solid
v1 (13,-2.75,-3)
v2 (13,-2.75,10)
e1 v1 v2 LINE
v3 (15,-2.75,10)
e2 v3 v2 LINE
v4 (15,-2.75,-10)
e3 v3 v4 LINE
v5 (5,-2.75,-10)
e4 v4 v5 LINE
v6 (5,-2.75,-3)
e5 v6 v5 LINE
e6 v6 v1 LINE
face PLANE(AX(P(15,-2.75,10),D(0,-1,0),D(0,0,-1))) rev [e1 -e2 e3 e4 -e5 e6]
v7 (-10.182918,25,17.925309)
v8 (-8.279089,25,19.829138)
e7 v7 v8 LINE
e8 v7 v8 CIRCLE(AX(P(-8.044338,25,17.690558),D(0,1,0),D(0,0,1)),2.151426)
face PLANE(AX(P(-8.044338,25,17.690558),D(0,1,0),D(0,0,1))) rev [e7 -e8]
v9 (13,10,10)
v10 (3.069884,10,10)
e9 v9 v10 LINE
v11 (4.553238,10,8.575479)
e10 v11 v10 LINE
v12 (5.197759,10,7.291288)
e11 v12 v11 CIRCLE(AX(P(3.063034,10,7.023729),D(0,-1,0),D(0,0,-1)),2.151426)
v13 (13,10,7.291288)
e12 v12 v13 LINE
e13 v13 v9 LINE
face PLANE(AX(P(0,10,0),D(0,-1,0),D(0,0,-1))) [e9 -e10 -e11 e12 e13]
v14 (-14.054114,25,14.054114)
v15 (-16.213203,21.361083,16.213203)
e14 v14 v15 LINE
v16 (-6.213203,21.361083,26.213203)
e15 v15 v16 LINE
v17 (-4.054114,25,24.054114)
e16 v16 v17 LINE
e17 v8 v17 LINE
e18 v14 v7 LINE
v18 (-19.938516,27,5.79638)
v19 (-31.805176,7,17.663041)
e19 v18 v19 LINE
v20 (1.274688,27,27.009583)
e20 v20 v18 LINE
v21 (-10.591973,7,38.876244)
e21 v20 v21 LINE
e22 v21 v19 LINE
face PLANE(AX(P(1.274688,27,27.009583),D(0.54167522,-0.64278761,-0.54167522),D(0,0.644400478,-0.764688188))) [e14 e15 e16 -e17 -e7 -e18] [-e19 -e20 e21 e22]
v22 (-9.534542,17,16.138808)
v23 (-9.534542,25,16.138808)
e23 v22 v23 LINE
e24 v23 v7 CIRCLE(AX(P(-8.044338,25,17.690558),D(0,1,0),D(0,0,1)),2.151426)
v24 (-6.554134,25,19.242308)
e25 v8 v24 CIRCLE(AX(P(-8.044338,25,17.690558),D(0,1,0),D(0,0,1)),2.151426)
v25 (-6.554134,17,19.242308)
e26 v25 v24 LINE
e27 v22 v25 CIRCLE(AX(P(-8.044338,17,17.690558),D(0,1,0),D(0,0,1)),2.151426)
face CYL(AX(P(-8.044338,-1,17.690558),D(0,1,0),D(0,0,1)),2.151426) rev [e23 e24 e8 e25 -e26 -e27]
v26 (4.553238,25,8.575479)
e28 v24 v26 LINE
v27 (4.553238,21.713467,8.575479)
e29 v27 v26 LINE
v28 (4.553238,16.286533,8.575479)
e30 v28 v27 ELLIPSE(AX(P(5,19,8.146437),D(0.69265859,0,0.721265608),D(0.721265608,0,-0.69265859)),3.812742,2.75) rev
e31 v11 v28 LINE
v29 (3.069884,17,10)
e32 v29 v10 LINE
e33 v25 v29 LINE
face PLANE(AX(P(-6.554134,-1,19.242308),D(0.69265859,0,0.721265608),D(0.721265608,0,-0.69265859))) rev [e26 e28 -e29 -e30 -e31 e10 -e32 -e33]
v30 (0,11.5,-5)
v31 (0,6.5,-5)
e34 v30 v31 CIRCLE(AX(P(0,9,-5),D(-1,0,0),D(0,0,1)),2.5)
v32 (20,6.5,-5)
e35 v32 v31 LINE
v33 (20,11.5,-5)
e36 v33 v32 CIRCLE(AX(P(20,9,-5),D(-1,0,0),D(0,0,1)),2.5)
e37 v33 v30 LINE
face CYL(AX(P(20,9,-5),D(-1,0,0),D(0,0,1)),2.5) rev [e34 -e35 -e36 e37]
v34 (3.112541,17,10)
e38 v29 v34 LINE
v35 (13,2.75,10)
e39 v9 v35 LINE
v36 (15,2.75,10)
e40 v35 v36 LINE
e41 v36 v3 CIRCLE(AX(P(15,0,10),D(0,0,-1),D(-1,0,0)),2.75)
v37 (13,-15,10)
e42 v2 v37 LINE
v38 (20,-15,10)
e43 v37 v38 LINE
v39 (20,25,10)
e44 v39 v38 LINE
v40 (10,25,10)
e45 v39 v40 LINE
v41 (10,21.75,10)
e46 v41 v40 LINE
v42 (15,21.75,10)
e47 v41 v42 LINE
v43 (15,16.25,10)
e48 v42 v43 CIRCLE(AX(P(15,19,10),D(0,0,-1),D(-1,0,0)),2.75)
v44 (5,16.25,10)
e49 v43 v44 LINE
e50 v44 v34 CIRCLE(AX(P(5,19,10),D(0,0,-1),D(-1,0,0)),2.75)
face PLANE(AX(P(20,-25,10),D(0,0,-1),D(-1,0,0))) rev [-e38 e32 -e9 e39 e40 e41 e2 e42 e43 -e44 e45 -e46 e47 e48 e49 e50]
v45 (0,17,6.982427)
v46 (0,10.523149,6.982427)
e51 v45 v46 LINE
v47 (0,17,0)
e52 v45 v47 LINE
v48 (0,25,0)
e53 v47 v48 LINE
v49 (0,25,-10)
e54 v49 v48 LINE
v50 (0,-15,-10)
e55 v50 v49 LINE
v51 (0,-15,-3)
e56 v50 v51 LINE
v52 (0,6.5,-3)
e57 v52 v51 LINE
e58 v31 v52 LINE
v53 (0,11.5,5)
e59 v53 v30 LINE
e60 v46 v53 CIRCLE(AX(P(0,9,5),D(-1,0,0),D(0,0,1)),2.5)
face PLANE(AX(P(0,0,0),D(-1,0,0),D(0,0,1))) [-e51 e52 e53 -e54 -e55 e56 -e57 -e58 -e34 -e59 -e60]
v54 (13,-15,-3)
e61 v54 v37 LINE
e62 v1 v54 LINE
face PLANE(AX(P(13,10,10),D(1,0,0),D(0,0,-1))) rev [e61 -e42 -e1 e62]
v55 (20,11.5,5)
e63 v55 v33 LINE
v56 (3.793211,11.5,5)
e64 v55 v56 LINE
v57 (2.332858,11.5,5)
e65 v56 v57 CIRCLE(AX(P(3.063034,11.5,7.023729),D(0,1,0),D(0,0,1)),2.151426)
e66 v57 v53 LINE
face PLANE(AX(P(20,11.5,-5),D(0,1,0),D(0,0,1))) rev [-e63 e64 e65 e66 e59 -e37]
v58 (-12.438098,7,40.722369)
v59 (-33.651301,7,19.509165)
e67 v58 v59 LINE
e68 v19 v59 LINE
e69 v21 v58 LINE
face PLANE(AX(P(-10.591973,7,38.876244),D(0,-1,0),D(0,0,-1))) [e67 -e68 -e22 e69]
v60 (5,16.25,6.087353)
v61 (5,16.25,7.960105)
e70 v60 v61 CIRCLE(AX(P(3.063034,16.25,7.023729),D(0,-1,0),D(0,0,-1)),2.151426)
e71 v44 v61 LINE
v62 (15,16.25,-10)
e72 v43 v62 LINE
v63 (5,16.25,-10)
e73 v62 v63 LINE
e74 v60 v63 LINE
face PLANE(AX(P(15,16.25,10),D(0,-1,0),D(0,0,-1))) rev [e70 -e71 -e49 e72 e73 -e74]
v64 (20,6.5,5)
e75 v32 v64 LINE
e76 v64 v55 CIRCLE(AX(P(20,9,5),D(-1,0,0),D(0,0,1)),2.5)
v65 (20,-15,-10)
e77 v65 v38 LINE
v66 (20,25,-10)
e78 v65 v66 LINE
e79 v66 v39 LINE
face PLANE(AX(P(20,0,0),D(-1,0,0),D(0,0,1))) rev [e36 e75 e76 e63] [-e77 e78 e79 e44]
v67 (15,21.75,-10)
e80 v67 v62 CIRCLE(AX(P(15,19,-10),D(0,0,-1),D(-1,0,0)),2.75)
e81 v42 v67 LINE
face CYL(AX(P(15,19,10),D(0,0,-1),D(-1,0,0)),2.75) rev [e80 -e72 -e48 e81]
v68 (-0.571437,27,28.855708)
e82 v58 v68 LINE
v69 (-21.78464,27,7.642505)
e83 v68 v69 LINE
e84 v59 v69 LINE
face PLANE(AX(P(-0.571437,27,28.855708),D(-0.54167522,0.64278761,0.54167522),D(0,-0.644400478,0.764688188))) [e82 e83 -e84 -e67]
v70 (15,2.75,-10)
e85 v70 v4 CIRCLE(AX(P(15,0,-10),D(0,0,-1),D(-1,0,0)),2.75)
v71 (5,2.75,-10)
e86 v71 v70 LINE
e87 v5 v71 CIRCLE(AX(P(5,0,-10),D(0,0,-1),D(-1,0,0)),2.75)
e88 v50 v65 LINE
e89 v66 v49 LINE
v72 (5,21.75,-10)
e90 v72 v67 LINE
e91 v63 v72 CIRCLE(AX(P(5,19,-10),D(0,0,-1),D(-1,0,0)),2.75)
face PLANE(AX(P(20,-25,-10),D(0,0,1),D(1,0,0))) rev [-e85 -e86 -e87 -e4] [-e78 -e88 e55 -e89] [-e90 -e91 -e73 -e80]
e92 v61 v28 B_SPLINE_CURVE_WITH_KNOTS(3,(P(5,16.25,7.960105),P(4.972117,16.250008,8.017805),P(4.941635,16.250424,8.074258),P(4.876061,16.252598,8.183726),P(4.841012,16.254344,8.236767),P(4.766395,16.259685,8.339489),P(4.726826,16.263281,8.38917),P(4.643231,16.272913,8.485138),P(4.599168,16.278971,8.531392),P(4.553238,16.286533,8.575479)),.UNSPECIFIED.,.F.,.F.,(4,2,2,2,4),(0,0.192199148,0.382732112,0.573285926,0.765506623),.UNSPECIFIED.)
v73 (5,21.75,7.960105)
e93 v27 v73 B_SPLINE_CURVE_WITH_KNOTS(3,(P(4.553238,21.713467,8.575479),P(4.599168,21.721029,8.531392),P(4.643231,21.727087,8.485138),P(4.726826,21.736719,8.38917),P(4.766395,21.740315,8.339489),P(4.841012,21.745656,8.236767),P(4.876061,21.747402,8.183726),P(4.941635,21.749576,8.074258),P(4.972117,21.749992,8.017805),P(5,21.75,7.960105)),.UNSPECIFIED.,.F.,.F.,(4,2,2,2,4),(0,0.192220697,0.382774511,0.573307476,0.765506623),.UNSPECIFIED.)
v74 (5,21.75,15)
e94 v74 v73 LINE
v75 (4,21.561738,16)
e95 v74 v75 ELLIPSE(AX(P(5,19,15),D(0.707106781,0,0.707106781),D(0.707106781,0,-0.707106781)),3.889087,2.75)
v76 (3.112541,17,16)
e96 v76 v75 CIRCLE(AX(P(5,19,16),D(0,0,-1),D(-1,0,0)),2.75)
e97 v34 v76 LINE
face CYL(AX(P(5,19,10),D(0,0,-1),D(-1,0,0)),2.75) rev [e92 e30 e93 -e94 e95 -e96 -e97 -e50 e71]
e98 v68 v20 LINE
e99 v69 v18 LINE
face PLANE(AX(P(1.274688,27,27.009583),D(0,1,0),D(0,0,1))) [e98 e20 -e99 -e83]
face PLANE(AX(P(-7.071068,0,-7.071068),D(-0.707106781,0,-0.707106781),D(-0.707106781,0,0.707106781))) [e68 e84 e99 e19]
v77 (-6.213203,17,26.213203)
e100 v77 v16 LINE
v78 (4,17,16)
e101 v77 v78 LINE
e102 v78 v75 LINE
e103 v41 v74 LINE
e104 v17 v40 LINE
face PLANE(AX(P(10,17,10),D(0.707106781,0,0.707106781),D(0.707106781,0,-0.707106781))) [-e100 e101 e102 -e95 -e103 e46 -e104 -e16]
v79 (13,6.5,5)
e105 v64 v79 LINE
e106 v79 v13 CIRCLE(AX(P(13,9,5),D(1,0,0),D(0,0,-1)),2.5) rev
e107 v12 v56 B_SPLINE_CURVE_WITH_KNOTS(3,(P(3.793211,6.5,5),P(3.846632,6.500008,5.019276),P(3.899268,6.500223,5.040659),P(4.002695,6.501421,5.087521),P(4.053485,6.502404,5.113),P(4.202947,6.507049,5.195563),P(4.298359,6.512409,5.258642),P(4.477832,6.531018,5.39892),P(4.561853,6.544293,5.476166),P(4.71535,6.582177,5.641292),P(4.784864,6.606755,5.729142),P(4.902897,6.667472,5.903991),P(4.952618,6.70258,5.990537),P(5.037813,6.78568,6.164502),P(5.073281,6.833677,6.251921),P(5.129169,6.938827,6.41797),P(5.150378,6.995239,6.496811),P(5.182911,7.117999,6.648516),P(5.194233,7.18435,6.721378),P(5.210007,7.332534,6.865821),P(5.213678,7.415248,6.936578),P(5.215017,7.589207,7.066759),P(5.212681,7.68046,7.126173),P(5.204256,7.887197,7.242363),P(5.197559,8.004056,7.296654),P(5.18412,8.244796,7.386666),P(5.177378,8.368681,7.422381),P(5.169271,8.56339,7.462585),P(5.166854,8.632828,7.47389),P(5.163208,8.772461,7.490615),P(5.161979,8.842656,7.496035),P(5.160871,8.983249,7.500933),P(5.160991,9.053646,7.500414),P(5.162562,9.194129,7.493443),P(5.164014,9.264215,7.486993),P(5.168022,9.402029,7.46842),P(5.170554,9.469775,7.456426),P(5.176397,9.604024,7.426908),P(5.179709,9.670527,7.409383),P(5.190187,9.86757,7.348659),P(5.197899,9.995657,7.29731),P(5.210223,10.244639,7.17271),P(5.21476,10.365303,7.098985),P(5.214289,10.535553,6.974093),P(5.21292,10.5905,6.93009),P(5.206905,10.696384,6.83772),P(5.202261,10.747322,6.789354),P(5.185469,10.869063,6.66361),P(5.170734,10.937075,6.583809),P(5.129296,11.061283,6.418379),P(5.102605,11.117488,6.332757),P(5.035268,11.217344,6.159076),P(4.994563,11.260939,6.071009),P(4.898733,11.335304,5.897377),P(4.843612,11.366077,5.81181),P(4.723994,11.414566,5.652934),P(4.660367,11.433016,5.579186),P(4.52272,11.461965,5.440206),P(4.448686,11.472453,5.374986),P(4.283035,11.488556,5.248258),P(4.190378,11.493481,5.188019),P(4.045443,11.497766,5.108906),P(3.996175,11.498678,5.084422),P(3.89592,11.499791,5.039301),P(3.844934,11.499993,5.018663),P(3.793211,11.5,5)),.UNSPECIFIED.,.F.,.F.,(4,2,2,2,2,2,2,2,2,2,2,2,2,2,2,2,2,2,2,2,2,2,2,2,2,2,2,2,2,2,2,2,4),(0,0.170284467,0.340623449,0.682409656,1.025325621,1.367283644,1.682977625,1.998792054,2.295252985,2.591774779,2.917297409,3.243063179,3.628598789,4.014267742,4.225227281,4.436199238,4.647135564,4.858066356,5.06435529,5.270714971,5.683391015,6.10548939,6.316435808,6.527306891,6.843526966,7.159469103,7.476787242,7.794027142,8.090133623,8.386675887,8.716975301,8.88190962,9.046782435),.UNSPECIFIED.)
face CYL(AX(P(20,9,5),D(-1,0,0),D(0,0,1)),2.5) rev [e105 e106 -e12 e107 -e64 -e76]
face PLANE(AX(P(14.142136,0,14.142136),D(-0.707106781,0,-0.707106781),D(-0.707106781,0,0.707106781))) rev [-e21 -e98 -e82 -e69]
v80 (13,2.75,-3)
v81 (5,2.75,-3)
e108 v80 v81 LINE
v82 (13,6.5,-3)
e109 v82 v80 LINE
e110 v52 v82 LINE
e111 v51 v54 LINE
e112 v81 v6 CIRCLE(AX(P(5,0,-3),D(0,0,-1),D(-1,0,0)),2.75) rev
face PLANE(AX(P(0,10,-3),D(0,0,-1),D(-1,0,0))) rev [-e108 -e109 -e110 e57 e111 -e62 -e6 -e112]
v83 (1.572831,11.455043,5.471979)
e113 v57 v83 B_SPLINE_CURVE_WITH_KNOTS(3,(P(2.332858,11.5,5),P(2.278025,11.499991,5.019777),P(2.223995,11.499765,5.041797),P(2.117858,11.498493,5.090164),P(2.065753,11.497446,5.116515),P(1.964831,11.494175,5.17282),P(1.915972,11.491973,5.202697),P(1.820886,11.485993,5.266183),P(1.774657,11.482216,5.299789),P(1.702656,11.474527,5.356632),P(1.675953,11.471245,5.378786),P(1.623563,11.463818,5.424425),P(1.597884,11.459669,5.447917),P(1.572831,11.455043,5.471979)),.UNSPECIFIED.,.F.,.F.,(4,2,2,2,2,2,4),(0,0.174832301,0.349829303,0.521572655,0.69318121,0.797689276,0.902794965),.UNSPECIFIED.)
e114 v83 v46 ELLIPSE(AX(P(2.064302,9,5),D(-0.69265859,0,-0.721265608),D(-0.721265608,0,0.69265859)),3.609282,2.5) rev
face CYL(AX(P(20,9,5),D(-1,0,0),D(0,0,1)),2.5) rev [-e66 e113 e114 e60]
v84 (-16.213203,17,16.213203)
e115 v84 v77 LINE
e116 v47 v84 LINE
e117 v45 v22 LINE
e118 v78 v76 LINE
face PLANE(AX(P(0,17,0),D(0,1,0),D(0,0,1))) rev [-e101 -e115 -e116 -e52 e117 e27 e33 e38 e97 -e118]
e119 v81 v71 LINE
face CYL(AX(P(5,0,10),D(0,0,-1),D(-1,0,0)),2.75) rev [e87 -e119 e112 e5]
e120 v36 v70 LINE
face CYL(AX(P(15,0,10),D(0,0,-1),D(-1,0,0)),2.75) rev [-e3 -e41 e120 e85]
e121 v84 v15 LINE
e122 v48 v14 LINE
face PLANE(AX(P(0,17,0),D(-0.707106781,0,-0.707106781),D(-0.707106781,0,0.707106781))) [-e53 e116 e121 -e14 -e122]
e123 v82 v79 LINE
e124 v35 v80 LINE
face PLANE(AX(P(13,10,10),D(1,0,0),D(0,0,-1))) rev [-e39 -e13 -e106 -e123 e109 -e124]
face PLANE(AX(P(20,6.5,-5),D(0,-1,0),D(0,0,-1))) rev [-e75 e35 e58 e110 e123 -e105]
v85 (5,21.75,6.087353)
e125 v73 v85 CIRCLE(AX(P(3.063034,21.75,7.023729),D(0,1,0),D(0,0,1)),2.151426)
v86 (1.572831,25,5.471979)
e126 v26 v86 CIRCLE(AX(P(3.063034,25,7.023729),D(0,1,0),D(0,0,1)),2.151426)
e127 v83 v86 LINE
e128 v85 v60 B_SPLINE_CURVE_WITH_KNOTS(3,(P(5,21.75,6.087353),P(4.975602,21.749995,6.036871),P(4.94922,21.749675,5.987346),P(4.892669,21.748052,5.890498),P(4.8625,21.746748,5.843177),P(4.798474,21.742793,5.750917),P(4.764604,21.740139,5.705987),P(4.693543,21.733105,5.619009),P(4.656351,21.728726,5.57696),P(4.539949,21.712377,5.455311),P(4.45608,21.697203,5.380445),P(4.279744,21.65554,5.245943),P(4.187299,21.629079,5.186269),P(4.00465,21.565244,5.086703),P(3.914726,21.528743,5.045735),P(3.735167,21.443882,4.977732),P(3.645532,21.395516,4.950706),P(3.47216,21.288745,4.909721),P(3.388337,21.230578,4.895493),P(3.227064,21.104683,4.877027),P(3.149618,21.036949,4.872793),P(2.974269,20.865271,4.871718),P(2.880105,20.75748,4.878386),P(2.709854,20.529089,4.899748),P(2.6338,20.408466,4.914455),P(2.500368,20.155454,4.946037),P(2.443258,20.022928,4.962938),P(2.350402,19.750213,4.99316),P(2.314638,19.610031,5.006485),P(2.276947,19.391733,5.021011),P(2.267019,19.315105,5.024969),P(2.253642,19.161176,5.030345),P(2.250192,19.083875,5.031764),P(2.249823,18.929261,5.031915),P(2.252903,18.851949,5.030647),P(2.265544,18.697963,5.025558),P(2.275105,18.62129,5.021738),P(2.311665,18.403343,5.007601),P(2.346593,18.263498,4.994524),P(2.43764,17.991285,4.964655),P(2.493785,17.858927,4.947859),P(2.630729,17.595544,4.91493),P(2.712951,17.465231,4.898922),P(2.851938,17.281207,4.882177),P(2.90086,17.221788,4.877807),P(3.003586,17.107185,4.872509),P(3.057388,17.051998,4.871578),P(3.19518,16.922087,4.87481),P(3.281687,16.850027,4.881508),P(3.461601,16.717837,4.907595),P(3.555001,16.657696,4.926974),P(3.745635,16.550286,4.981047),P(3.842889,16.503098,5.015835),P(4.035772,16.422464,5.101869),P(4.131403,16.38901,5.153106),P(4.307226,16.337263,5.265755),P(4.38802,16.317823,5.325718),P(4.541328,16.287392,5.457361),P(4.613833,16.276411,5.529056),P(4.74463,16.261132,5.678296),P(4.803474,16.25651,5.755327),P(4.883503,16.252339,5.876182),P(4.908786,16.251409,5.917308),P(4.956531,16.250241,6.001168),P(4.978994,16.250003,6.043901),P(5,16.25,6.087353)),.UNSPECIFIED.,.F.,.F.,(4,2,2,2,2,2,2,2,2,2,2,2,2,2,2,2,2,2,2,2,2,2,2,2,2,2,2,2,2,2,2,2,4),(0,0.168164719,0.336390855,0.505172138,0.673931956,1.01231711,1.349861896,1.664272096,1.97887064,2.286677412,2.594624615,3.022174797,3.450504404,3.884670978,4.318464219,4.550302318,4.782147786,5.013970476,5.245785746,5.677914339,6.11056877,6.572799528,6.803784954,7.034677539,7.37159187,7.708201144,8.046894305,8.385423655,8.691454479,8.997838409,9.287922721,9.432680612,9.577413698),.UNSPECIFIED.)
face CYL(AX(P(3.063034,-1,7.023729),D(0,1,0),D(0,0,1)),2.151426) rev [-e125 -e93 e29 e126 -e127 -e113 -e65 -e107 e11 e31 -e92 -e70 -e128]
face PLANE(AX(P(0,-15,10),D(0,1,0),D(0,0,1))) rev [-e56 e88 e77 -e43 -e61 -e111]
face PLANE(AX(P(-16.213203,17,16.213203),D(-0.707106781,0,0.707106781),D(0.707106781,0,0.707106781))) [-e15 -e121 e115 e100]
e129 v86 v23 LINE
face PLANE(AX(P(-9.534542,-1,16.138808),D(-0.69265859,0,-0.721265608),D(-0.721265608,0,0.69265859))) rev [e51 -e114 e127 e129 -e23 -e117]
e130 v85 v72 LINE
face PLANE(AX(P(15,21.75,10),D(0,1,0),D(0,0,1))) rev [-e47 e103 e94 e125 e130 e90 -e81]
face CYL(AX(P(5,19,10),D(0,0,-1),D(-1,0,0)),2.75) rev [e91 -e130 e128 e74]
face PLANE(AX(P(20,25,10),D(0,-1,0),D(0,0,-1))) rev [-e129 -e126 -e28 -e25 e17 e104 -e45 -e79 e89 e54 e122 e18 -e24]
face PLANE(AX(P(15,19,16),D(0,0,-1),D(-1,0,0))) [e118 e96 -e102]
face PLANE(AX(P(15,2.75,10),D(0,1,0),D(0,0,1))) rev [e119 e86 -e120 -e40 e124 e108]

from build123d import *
from build123d.topology import SkipClean

# Parameters (mm, degrees)
SKETCH_1_W           = 20
SKETCH_1_H           = 50
EXTRUDE_2_DEPTH      = 20
SKETCH_2_W           = 20
SKETCH_2_H           = 10
CUT_EXTRUDE_1_DEPTH  = 20
CUT_EXTRUDE_2_DEPTH  = 20
CUT_EXTRUDE_3_DEPTH  = 20
CUT_EXTRUDE_4_DEPTH  = 20
SKETCH_6_W           = 13
SKETCH_6_H           = 13
CUT_EXTRUDE_5_DEPTH  = 25
EXTRUDE_3_DEPTH      = 8
EXTRUDE_6_DEPTH      = 10
EXTRUDE_6_DEPTH_BACK = 20
CUT_EXTRUDE_7_DEPTH  = 18
CUT_EXTRUDE_8_DEPTH  = 26
CUT_EXTRUDE_9_DEPTH  = 26


with BuildPart() as part:
    # 草图1 → 凸台-拉伸2 (new body)
    with BuildSketch(Plane(origin=(0, 0, 0), x_dir=(0, 0, -1), z_dir=(1, 0, 0))):
        Rectangle(SKETCH_1_W, SKETCH_1_H)
    extrude(amount=EXTRUDE_2_DEPTH)

    # 草图2 → 切除-拉伸1 (cut)
    with BuildSketch(Plane(origin=(20, 0, 0), x_dir=(0, 0, -1), z_dir=(1, 0, 0))):
        with Locations((0, -20)):
            Rectangle(SKETCH_2_W, SKETCH_2_H)
    extrude(amount=-CUT_EXTRUDE_1_DEPTH, mode=Mode.SUBTRACT)

    # 草图3 → 切除-拉伸2 (cut)
    with BuildSketch(Plane(origin=(0, 0, -10), x_dir=(-1, 0, 0), z_dir=(0, 0, -1))):
        with BuildLine():
            Line((-15, 21.75), (-5, 21.75))
            ThreePointArc((-5, 21.75), (-2.25, 19), (-5, 16.25))
            Line((-5, 16.25), (-15, 16.25))
            ThreePointArc((-15, 16.25), (-17.75, 19), (-15, 21.75))
        make_face()
    extrude(amount=-CUT_EXTRUDE_2_DEPTH, mode=Mode.SUBTRACT)

    # 草图4 → 切除-拉伸3 (cut)
    with BuildSketch(Plane.ZY):
        with BuildLine():
            Line((-5, 11.5), (5, 11.5))
            ThreePointArc((5, 11.5), (7.5, 9), (5, 6.5))
            Line((5, 6.5), (-5, 6.5))
            ThreePointArc((-5, 6.5), (-7.5, 9), (-5, 11.5))
        make_face()
    extrude(amount=-CUT_EXTRUDE_3_DEPTH, mode=Mode.SUBTRACT)

    # 草图5 → 切除-拉伸4 (cut)
    with BuildSketch(Plane(origin=(0, 0, -10), x_dir=(-1, 0, 0), z_dir=(0, 0, -1))):
        with BuildLine():
            Line((-15, 2.75), (-5, 2.75))
            ThreePointArc((-5, 2.75), (-2.25, 0), (-5, -2.75))
            Line((-5, -2.75), (-15, -2.75))
            ThreePointArc((-15, -2.75), (-17.75, 0), (-15, 2.75))
        make_face()
    extrude(amount=-CUT_EXTRUDE_4_DEPTH, mode=Mode.SUBTRACT)

    # 草图6 → 切除-拉伸5 (cut)
    with BuildSketch(Plane.XZ.offset(15)):
        with Locations((6.5, 3.5)):
            Rectangle(SKETCH_6_W, SKETCH_6_H)
    extrude(amount=-CUT_EXTRUDE_5_DEPTH, mode=Mode.SUBTRACT)

    # 草图7 → 凸台-拉伸3 (add)
    with BuildSketch(Plane(origin=(0, 25, 0), x_dir=(1, 0, 0), z_dir=(0, 1, 0))):
        Polygon((-16.213203436, -16.213203436), (-6.213203436, -26.213203436), (10, -10), (0, 0), align=None)
    extrude(amount=-EXTRUDE_3_DEPTH)

    # 草图8 → 凸台-拉伸6 (add, two sides: drawn at the far end of the back side and taken through both)
    with BuildSketch(Plane(origin=(0, 0, 0), x_dir=(-0.707106781186539, 0, 0.707106781186556), z_dir=(-0.707106781186556, 0, -0.707106781186539)).offset(-EXTRUDE_6_DEPTH_BACK)):
        Polygon((18.197319143, 27), (34.979311766, 7), (37.590126345, 7), (20.808133721, 27), align=None)
    extrude(amount=EXTRUDE_6_DEPTH + EXTRUDE_6_DEPTH_BACK)

    # 草图11 → 切除-拉伸7 (cut)
    with BuildSketch(Plane(origin=(10, 0, 10), x_dir=(0.7071067811865497, 0, -0.7071067811865454), z_dir=(0.7071067811865454, 0, 0.7071067811865497))):
        Polygon((-22.928932188, 24.472530808), (-22.486332984, 25), (-22.928932188, 25), align=None)
    extrude(amount=-CUT_EXTRUDE_7_DEPTH, mode=Mode.SUBTRACT)

    # 草图12 → 切除-拉伸8 (cut)
    with SkipClean():  # the faces are left unmerged after this step: merging them gives an invalid solid
        with BuildSketch(Plane(origin=(0, 0, -10), x_dir=(-1, 0, 0), z_dir=(0, 0, -1))):
            with BuildLine():
                Line((-15, 16.25), (-5, 16.25))
                ThreePointArc((-5, 16.25), (-2.25, 19), (-5, 21.75))
                Line((-5, 21.75), (-15, 21.75))
                ThreePointArc((-15, 21.75), (-17.75, 19), (-15, 16.25))
            make_face()
        extrude(amount=-CUT_EXTRUDE_8_DEPTH, mode=Mode.SUBTRACT)
    add(part.part.scale(1), mode=Mode.REPLACE)  # the faces are merged on a copy

    # 草图13 → 切除-拉伸9 (cut)
    with BuildSketch(Plane(origin=(0, 25, 0), x_dir=(1, 0, 0), z_dir=(0, 1, 0))):
        with BuildLine():
            Line((-9.534541797, -16.138807841), (1.572830507, -5.47197893))
            ThreePointArc((1.572830507, -5.47197893), (4.614784317, -5.533524822), (4.553238425, -8.575478633))
            Line((4.553238425, -8.575478633), (-6.554133879, -19.242307544))
            ThreePointArc((-6.554133879, -19.242307544), (-9.596087689, -19.180761651), (-9.534541797, -16.138807841))
        make_face()
    extrude(amount=-CUT_EXTRUDE_9_DEPTH, mode=Mode.SUBTRACT)


solid = part.part
